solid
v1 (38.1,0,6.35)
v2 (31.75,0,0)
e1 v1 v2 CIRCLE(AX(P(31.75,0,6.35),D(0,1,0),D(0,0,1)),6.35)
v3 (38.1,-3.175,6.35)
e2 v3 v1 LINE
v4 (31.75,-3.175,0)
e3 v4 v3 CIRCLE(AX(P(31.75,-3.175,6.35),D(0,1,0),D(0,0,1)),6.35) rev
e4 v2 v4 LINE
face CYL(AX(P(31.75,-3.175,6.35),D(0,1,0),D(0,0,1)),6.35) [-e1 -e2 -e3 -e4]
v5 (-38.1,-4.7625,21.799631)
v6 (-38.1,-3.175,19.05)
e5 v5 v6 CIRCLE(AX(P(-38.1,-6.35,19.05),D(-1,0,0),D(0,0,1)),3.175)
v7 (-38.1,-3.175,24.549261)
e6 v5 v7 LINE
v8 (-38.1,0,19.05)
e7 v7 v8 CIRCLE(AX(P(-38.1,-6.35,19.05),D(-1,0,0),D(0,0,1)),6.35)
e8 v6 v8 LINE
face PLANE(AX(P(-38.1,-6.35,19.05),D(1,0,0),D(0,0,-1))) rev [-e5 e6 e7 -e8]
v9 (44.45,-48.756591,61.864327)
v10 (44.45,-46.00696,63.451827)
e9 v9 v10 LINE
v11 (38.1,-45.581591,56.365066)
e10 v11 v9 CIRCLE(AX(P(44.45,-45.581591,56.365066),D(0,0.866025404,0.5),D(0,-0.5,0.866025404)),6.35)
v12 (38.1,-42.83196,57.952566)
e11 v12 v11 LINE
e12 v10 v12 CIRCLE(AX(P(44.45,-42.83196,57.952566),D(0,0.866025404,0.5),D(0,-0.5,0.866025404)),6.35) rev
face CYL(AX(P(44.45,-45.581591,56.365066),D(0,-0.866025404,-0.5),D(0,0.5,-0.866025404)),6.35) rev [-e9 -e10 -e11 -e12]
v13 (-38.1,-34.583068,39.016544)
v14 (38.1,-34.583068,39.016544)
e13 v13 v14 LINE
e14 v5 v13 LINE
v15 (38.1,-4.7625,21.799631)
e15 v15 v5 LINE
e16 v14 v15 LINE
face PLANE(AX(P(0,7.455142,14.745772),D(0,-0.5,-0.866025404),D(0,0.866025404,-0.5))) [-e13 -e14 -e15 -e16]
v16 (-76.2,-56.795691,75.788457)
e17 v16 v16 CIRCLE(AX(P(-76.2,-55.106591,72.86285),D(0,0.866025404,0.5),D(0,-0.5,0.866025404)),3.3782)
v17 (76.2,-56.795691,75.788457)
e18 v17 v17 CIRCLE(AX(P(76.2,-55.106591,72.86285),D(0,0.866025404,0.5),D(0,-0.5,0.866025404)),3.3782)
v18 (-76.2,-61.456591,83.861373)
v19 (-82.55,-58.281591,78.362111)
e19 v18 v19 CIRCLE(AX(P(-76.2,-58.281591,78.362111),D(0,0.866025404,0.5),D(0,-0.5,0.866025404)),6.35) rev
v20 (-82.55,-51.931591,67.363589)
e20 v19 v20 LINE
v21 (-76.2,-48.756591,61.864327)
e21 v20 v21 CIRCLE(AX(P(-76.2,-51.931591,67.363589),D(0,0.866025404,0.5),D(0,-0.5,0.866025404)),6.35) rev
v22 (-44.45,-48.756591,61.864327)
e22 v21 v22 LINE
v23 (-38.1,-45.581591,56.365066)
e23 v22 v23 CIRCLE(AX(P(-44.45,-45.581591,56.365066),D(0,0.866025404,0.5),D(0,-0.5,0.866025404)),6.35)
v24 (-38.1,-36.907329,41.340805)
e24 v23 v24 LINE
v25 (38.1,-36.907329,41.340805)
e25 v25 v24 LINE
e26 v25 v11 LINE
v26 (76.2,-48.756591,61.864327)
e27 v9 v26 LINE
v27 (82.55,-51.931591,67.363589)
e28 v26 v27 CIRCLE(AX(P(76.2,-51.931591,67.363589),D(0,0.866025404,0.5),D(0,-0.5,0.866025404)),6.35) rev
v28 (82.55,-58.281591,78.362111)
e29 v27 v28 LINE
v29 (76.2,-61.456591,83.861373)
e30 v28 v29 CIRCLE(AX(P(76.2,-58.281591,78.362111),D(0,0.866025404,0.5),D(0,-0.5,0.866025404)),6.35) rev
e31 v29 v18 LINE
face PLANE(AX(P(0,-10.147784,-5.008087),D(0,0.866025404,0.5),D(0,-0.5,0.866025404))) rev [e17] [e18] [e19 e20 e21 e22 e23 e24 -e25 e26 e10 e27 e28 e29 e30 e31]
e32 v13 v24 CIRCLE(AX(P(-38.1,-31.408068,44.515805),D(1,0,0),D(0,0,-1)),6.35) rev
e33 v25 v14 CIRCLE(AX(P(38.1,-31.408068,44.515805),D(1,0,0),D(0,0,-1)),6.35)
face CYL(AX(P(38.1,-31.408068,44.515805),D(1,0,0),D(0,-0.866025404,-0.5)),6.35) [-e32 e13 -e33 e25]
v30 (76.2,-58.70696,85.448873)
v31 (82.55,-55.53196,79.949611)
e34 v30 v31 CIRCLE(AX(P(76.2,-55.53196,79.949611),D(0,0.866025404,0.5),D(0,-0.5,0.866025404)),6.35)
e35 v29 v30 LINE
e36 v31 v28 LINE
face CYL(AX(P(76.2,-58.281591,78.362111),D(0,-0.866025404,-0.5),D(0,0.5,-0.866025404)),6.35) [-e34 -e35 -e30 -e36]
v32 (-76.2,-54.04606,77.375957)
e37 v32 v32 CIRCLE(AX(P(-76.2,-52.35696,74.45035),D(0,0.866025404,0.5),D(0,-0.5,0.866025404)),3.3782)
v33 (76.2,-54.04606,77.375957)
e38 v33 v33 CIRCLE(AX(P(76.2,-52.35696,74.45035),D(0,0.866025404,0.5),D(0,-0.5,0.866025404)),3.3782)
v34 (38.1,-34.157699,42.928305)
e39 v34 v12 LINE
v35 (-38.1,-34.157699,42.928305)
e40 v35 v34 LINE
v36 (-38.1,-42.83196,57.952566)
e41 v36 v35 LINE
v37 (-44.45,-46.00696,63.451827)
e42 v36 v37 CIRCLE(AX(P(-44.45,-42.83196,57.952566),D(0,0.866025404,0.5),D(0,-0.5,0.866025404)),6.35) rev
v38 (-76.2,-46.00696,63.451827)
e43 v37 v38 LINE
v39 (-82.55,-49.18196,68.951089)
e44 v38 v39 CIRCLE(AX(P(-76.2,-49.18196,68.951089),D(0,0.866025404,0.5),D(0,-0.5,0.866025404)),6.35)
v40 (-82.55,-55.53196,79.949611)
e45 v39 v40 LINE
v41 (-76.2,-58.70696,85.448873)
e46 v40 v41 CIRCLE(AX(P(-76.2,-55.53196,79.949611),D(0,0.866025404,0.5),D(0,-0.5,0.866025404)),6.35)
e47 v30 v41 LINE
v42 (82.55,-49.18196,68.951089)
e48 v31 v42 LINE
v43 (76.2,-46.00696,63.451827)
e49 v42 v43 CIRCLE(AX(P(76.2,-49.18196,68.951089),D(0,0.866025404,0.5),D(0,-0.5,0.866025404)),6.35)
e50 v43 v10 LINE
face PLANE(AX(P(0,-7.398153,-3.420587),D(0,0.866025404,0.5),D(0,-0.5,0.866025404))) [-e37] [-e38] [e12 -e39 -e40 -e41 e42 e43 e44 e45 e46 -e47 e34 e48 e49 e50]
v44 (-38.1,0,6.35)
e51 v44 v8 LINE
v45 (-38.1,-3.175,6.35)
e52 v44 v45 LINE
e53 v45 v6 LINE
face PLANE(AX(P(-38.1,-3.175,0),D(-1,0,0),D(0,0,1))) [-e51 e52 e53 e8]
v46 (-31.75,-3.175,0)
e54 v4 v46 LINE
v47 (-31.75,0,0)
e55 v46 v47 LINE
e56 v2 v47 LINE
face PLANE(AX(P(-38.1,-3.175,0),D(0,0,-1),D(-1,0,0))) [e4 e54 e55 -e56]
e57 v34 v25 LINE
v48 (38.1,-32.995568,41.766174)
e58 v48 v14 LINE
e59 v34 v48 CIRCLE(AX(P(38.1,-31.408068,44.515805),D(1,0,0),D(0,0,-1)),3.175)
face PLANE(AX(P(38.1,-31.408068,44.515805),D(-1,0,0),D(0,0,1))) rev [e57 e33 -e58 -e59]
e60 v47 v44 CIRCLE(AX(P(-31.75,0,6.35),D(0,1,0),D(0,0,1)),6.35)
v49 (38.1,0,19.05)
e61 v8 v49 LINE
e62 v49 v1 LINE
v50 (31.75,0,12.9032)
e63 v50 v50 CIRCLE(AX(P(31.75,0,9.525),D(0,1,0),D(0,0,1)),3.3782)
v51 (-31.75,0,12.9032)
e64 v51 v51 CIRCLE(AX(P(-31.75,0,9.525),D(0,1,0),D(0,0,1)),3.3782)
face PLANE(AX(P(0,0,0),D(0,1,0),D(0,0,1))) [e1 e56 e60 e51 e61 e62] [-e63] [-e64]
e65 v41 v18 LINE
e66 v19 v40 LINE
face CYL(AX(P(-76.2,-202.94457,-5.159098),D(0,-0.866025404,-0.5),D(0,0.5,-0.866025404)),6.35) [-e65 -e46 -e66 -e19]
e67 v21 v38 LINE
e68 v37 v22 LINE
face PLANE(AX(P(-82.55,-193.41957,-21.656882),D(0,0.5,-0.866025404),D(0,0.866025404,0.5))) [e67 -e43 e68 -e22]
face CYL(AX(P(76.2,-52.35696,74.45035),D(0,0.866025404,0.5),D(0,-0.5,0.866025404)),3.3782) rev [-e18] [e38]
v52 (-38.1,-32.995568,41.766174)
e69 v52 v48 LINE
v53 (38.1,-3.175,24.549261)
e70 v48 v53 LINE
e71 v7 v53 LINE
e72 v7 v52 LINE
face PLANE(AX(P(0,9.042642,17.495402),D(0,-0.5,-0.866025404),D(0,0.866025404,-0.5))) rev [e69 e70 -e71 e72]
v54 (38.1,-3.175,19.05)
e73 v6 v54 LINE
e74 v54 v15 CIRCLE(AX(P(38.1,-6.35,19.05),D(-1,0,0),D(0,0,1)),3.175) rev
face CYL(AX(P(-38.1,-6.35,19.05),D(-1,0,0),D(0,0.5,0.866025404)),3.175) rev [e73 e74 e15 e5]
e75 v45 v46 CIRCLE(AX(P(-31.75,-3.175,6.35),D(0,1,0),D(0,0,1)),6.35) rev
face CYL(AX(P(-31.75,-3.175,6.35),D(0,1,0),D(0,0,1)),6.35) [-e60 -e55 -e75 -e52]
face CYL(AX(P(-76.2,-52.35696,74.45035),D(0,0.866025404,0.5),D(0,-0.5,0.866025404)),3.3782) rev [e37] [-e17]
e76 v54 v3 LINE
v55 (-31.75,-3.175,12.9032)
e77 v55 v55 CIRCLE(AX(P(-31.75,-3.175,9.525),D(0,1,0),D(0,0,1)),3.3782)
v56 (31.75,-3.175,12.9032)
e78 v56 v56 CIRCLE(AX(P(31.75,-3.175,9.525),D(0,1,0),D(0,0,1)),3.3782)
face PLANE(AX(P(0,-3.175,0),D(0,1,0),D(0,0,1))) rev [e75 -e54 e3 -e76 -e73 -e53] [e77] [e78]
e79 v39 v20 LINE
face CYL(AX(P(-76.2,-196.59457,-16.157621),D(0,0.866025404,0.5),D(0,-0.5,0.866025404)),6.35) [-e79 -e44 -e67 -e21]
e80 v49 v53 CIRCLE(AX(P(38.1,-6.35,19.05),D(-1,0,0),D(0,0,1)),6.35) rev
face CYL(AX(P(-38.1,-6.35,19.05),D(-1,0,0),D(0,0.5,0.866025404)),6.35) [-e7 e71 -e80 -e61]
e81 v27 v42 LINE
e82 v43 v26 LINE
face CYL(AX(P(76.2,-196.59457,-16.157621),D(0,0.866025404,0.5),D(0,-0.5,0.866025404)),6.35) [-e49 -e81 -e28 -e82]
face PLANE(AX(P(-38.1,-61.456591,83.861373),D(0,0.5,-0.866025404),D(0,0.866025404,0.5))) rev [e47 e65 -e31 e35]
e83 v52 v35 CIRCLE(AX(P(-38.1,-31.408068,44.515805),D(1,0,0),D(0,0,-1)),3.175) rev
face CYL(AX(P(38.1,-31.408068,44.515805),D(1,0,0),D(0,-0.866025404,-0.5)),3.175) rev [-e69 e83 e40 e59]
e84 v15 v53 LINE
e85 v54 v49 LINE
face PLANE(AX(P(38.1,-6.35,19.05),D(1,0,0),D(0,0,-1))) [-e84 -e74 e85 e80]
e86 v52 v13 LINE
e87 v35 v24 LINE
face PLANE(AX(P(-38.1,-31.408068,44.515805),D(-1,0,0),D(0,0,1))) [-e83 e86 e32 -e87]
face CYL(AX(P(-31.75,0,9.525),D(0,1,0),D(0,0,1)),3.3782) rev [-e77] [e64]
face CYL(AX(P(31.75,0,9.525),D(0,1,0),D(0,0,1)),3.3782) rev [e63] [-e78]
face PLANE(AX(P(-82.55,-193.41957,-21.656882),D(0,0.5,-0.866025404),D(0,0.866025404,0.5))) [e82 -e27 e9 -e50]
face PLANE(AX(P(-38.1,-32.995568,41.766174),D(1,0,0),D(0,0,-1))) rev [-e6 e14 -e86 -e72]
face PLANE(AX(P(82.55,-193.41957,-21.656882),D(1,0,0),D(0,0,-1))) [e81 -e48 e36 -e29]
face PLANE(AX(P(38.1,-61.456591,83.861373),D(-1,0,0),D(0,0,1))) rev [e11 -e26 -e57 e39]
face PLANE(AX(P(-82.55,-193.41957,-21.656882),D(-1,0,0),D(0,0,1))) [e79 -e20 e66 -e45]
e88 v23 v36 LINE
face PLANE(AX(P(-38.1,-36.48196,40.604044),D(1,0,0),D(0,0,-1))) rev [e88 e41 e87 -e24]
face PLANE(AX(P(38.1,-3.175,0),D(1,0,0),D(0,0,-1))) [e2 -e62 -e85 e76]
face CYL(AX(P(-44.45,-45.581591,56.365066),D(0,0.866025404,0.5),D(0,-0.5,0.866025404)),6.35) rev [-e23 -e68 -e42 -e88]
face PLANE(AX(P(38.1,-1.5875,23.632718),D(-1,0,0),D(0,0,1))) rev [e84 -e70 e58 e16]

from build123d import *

# Parameters (mm, degrees)
SKETCH1_W               = 76.2
SKETCH1_H               = 19.05
BASE_FLANGE1_DEPTH      = 3.175
EDGE_FLANGE1_DEPTH      = 76.2
EDGE_FLANGE2_DEPTH      = 76.2
F_1_4_CLEARANCE_HOLE1_D = 6.7564
SKETCH17_W              = 165.1
SKETCH17_H              = 25.4
BOSS_EXTRUDE1_DEPTH     = 3.175
F_1_4_CLEARANCE_HOLE3_D = 6.7564
FILLET1_R               = 6.35


# Sheet-metal steps are written as plain solids
with BuildPart() as part:
    # Sketch1 → Base-Flange1 (new body)
    with BuildSketch(Plane(origin=(0, 0, 0), x_dir=(1, 0, 0), z_dir=(0, 1, 0))):
        with Locations((0, -9.525)):
            Rectangle(SKETCH1_W, SKETCH1_H)
    extrude(amount=-BASE_FLANGE1_DEPTH)

    # Edge-Flange1 section (across the edge) → Edge-Flange1 (add)
    with BuildSketch(Plane(origin=(38.1, -3.175, 20.883087105), x_dir=(0, -0.5000000000000041, -0.8660254037844364), z_dir=(-1, 0, 0))):
        with BuildLine():
            Line((-3.175, 1.833087105), (-3.175, 36.266912895))
            Line((-3.175, 36.266912895), (0, 36.266912895))
            Line((0, 36.266912895), (0, 1.833087105))
            ThreePointArc((0, 1.833087105), (0.425369343, 0.245587105), (1.5875, -0.916543552))
            Line((1.5875, -0.916543552), (0, -3.666174209))
            ThreePointArc((0, -3.666174209), (-2.324261314, -1.341912895), (-3.175, 1.833087105))
        make_face()
    extrude(amount=EDGE_FLANGE1_DEPTH)

    # Edge-Flange2 section (across the edge) → Edge-Flange2 (add)
    with BuildSketch(Plane(origin=(-38.1, -33.732329198, 42.191543552), x_dir=(0, 0.866025403784438, 0.5000000000000012), z_dir=(1, 0, 0))):
        with BuildLine():
            Line((-3.175, 0.850738686), (-3.175, 49.949261314))
            Line((-3.175, 49.949261314), (0, 49.949261314))
            Line((0, 49.949261314), (0, 0.850738686))
            ThreePointArc((0, 0.850738686), (0.108185502, 0.028988218), (0.425369343, -0.736761314))
            Line((0.425369343, -0.736761314), (-2.324261314, -2.324261314))
            ThreePointArc((-2.324261314, -2.324261314), (-2.958628997, -0.79276225), (-3.175, 0.850738686))
        make_face()
    extrude(amount=EDGE_FLANGE2_DEPTH)

    # 1/4 Clearance Hole1 (through all)
    with Locations(Plane(origin=(0, 0, 0), x_dir=(1, 0, 0), z_dir=(0, 1, 0))):
        with Locations((-31.75, -9.525), (31.75, -9.525)):
            Hole(F_1_4_CLEARANCE_HOLE1_D / 2)

    # Sketch17 → Boss-Extrude1 (add)
    with BuildSketch(Plane(origin=(0, -7.029772628, -4.058641119), x_dir=(1, 0, 0), z_dir=(0, 0.866025403784438, 0.5000000000000012))):
        with Locations((0, -90.654374454)):
            Rectangle(SKETCH17_W, SKETCH17_H)
    extrude(amount=-BOSS_EXTRUDE1_DEPTH)

    # 1/4 Clearance Hole3 (through all)
    with Locations(Plane(origin=(0, -7.029772628, -4.058641119), x_dir=(1, 0, 0), z_dir=(0, 0.866025403784438, 0.5000000000000012))):
        with Locations((76.2, -90.654374454), (-76.2, -90.654374454)):
            Hole(F_1_4_CLEARANCE_HOLE3_D / 2)

    # Fillet1
    fillet1_edges = [part.edges().sort_by_distance(p)[0] for p in [
        (82.55, -60.081775184, 84.655122751),
        (-82.55, -47.381775184, 62.658077494),
        (82.55, -47.381775184, 62.658077494),
        (-82.55, -60.081775184, 84.655122751),
        (-38.1, -47.381775184, 62.658077494),
        (38.1, -47.381775184, 62.658077494),
        (-38.1, -1.5875, 0),
        (38.1, -1.5875, 0),
    ]]
    fillet(fillet1_edges, radius=FILLET1_R)


solid = part.part
